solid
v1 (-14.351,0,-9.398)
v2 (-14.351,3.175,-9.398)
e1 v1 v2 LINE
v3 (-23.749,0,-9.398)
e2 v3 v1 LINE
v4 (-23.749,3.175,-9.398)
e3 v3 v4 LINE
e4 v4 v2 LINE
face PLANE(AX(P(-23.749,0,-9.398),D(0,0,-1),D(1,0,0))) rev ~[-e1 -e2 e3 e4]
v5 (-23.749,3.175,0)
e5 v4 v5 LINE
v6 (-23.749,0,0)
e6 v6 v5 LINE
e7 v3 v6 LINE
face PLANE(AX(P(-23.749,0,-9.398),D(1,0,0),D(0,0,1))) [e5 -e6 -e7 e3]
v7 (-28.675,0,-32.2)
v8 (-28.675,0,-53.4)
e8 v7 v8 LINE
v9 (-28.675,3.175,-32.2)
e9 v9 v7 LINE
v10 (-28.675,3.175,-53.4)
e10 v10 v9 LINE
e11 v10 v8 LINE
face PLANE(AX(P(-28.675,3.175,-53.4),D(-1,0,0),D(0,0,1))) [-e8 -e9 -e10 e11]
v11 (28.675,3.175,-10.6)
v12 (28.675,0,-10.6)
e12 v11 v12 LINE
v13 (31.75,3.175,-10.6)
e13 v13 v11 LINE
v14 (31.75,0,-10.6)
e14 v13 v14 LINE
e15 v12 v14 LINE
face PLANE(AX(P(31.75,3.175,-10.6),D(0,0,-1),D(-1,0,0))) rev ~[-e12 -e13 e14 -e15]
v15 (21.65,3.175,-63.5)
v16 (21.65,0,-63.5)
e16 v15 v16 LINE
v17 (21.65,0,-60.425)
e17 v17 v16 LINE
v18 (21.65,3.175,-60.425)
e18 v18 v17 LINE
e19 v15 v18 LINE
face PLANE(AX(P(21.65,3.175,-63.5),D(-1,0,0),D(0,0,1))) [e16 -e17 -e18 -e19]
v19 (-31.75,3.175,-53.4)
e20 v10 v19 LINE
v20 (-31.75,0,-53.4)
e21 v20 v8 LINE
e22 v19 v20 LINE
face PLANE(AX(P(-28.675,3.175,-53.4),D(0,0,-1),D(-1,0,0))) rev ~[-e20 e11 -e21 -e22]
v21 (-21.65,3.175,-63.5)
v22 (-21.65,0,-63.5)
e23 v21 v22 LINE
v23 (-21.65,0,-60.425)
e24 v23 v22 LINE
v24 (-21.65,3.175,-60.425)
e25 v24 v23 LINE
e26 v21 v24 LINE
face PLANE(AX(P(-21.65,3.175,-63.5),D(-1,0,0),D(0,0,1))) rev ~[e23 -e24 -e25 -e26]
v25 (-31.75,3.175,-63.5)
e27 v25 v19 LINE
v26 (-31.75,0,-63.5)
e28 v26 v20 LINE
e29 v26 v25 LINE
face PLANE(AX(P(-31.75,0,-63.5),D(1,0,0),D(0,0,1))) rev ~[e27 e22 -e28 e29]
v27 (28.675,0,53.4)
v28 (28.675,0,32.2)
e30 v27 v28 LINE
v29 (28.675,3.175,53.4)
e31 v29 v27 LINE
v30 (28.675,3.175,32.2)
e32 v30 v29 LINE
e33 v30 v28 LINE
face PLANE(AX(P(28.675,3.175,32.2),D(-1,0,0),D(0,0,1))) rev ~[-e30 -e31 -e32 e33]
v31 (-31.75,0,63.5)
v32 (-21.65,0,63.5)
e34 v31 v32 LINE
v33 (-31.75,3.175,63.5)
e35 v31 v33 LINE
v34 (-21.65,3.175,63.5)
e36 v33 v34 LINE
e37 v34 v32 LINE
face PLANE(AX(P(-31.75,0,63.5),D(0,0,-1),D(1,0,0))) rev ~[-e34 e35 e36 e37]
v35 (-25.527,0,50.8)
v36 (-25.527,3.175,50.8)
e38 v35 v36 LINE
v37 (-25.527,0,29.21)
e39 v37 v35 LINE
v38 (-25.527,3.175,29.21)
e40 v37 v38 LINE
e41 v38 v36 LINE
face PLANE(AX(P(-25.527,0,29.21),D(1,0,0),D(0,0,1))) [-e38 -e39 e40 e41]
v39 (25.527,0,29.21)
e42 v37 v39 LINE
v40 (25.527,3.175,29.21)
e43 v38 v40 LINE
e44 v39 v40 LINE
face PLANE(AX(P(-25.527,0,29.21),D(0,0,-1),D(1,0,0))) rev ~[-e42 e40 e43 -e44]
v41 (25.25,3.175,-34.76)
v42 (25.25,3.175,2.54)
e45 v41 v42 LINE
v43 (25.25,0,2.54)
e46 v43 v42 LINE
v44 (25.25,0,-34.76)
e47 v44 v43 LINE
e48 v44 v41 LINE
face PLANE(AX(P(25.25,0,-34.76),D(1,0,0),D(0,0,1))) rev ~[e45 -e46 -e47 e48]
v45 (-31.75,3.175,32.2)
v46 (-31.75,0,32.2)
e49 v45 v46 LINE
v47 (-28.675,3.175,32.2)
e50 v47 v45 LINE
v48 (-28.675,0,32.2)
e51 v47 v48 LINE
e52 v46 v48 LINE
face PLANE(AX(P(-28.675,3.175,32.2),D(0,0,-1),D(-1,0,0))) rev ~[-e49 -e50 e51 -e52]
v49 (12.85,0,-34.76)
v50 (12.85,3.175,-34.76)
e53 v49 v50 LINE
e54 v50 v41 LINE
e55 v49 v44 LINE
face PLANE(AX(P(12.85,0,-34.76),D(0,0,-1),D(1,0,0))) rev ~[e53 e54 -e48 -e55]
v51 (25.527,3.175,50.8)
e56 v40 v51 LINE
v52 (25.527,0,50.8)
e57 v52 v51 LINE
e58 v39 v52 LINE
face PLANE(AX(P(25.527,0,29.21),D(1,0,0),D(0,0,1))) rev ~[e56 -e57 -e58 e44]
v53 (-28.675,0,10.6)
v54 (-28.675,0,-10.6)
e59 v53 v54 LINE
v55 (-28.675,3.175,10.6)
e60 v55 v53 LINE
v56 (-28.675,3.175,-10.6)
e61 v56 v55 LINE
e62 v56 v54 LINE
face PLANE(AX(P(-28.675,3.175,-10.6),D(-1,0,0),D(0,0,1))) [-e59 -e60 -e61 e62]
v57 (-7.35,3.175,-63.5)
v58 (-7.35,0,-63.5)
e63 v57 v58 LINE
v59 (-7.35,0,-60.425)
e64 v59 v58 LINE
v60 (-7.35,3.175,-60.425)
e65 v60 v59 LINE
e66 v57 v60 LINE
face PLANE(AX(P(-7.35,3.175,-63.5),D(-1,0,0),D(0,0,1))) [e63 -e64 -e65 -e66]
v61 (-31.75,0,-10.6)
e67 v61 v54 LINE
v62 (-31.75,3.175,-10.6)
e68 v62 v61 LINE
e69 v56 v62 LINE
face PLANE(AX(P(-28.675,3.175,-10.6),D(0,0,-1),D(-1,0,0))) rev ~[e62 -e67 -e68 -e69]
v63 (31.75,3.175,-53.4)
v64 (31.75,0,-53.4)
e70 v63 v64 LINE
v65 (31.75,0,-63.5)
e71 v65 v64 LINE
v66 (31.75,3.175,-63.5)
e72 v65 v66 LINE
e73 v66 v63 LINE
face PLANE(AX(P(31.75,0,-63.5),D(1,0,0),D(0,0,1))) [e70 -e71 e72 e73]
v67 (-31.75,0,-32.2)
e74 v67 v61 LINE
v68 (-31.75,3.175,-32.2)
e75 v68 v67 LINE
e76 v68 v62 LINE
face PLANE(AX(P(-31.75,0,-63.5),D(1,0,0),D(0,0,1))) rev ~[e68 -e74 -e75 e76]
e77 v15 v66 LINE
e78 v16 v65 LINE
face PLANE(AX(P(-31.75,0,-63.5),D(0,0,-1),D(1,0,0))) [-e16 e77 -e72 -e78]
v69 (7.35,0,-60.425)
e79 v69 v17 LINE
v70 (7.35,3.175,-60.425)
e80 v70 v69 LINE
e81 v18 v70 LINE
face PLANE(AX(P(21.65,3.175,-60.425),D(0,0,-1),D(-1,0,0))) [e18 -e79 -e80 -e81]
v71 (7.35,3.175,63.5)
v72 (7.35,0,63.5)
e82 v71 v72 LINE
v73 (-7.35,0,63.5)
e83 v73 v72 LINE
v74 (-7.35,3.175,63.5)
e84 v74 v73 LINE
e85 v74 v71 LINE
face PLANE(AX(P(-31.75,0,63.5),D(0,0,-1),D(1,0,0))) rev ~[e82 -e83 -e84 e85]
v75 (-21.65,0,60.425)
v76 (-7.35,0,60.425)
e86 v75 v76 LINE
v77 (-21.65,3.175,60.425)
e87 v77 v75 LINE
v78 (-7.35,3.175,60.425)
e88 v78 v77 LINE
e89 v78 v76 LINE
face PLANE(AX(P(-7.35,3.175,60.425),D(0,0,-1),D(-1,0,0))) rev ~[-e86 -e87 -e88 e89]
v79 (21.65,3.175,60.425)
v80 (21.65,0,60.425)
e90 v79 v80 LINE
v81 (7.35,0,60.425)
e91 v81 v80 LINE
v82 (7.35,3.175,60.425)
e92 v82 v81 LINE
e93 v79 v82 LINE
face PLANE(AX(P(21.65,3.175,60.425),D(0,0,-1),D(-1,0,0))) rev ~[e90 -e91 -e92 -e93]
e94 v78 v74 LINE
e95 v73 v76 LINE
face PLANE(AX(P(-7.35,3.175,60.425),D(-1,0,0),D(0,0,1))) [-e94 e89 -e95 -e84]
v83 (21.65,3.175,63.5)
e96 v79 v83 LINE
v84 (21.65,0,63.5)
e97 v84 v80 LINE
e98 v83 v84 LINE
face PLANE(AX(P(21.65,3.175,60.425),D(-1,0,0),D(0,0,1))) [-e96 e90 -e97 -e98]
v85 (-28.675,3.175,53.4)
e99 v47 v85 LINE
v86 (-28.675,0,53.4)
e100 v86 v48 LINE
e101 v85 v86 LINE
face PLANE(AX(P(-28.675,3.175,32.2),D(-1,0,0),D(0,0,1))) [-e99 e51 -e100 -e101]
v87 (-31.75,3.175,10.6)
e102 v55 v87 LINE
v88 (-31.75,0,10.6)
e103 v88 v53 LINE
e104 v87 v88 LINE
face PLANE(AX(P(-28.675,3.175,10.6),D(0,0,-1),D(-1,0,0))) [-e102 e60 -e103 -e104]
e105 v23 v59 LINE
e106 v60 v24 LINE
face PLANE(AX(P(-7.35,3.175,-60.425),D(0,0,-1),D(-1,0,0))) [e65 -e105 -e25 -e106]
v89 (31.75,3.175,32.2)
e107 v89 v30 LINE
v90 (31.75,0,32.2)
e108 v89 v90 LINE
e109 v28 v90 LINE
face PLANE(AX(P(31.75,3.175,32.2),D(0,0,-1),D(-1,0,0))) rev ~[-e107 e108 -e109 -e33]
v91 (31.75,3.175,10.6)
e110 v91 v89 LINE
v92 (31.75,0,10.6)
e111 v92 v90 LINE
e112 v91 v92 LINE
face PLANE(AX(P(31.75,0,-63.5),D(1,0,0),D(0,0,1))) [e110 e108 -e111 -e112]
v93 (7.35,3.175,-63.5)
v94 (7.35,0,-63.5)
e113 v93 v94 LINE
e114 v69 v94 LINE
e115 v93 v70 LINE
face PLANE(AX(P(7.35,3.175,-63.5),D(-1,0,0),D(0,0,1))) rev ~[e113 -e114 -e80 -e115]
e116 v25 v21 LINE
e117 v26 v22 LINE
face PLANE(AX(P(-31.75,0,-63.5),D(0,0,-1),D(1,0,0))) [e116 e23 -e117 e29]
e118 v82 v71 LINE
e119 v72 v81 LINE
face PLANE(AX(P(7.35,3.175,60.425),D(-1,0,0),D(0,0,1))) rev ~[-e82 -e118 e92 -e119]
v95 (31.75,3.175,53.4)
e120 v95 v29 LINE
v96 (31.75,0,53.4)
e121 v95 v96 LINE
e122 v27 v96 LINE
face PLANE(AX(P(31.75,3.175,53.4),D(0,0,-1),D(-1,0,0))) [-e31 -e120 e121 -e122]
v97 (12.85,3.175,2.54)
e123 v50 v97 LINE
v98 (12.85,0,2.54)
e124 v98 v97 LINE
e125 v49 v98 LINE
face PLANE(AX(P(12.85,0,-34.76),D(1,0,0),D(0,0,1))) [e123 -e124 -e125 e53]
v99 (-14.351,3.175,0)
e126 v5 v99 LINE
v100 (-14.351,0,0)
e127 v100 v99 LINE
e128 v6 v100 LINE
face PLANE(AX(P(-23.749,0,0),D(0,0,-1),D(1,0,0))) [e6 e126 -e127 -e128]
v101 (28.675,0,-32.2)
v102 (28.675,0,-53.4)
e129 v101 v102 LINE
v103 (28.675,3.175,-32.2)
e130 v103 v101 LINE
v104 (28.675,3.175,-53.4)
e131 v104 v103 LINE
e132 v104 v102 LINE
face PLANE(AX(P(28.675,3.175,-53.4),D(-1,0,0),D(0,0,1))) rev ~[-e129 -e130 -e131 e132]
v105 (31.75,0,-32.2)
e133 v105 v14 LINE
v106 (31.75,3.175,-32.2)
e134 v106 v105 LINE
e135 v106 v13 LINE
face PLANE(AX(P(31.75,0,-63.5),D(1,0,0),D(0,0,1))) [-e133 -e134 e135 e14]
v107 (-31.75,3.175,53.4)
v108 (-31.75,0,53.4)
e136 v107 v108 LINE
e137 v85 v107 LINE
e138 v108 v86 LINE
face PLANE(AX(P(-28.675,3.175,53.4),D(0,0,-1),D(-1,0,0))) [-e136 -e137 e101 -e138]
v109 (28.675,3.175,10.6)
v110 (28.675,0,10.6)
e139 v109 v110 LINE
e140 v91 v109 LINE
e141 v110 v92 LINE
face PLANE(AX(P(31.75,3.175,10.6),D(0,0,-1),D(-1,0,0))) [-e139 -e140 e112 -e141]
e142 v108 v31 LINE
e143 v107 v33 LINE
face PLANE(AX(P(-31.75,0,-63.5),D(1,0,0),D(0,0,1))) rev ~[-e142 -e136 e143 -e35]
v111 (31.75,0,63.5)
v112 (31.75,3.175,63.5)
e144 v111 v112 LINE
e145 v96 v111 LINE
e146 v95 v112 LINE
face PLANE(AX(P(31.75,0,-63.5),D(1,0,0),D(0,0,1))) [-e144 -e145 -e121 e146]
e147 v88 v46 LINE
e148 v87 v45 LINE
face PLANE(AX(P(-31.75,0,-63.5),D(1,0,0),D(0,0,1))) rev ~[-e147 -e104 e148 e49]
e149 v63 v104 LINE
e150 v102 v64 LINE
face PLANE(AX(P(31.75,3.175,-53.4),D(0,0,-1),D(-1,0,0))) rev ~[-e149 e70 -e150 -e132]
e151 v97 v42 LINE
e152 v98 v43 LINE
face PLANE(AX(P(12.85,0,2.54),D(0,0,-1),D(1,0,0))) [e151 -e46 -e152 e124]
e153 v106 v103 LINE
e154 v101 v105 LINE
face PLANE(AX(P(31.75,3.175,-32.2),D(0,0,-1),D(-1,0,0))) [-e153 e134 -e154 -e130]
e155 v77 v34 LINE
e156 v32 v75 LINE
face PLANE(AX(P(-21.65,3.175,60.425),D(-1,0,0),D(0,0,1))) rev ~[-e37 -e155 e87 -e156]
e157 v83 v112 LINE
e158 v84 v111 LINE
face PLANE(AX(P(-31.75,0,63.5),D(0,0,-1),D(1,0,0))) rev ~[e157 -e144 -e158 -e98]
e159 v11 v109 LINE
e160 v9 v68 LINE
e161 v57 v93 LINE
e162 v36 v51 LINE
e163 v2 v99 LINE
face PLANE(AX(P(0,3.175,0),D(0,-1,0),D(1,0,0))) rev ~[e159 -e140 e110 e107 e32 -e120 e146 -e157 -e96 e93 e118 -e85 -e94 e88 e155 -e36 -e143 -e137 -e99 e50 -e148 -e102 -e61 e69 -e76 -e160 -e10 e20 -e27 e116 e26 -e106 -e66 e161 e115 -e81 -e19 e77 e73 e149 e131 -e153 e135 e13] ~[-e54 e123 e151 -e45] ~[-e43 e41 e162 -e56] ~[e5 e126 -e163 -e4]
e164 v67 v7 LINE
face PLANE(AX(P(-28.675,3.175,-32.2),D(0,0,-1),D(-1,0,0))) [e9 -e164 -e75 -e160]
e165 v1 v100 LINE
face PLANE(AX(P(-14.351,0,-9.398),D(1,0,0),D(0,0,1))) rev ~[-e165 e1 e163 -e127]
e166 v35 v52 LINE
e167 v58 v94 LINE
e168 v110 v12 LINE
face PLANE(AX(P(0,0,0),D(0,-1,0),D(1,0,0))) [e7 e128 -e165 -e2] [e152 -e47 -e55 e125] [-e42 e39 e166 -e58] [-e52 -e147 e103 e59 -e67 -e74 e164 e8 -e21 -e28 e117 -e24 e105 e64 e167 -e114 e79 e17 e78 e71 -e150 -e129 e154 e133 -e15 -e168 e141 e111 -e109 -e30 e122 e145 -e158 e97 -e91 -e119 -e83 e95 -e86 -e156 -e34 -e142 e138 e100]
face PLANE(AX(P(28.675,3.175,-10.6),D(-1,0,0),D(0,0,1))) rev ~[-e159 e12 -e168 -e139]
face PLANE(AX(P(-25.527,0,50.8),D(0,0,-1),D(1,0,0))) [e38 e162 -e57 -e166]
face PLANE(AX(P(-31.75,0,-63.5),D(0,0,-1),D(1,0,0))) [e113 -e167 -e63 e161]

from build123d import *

# Parameters (mm, degrees)
F0_W     = 63.5
F0_H     = 127
F0_W_2   = 9.398
F0_H_2   = 9.398
F0_W_3   = 12.4
F0_H_3   = 37.3
F0_W_4   = 51.054
F0_H_4   = 21.59
F1_DEPTH = 3.175
F2_W     = 14.3
F2_H     = 3.075
F2_W_2   = 3.075
F2_H_2   = 21.2
F3_DEPTH = 25


# Not quite as in the source:
# - a feature of the source that left no trace in its solid (it failed there, or was rolled back) is left out
# - a length typed as a fraction of an inch, garbled in the dataset ("3 / 203.2 mm" for 3/8 in), is restored


with BuildPart() as f1:
    # F0 (on Front) → F1 (new body)
    with BuildSketch(Plane.XZ):
        Rectangle(F0_W, F0_H)
        with Locations((-19.05, -4.699)):
            Rectangle(F0_W_2, F0_H_2, mode=Mode.SUBTRACT)
        with Locations((19.05, -16.11)):
            Rectangle(F0_W_3, F0_H_3, mode=Mode.SUBTRACT)
        with Locations((0, 40.005)):
            Rectangle(F0_W_4, F0_H_4, mode=Mode.SUBTRACT)
    extrude(amount=-F1_DEPTH)

    # F2 (on face) → F3 (cut)
    with BuildSketch(Plane(origin=(0, 3.175, 0), x_dir=(-1, 0, 0), z_dir=(0, 1, 0))):
        with Locations((14.5, 61.9625)):
            Rectangle(F2_W, F2_H)
        with Locations((-14.5, 61.9625)):
            Rectangle(F2_W, F2_H)
        with Locations((-30.2125, -42.8)):
            Rectangle(F2_W_2, F2_H_2)
        with Locations((-30.2125, 0)):
            Rectangle(F2_W_2, F2_H_2)
        with Locations((-30.2125, 42.8)):
            Rectangle(F2_W_2, F2_H_2)
        with Locations((30.2125, -42.8)):
            Rectangle(F2_W_2, F2_H_2)
        with Locations((30.2125, 0)):
            Rectangle(F2_W_2, F2_H_2)
        with Locations((30.2125, 42.8)):
            Rectangle(F2_W_2, F2_H_2)
        with Locations((-14.5, -61.9625)):
            Rectangle(F2_W, F2_H)
        with Locations((14.5, -61.9625)):
            Rectangle(F2_W, F2_H)
    extrude(amount=-F3_DEPTH, mode=Mode.SUBTRACT)


solid = f1.part
